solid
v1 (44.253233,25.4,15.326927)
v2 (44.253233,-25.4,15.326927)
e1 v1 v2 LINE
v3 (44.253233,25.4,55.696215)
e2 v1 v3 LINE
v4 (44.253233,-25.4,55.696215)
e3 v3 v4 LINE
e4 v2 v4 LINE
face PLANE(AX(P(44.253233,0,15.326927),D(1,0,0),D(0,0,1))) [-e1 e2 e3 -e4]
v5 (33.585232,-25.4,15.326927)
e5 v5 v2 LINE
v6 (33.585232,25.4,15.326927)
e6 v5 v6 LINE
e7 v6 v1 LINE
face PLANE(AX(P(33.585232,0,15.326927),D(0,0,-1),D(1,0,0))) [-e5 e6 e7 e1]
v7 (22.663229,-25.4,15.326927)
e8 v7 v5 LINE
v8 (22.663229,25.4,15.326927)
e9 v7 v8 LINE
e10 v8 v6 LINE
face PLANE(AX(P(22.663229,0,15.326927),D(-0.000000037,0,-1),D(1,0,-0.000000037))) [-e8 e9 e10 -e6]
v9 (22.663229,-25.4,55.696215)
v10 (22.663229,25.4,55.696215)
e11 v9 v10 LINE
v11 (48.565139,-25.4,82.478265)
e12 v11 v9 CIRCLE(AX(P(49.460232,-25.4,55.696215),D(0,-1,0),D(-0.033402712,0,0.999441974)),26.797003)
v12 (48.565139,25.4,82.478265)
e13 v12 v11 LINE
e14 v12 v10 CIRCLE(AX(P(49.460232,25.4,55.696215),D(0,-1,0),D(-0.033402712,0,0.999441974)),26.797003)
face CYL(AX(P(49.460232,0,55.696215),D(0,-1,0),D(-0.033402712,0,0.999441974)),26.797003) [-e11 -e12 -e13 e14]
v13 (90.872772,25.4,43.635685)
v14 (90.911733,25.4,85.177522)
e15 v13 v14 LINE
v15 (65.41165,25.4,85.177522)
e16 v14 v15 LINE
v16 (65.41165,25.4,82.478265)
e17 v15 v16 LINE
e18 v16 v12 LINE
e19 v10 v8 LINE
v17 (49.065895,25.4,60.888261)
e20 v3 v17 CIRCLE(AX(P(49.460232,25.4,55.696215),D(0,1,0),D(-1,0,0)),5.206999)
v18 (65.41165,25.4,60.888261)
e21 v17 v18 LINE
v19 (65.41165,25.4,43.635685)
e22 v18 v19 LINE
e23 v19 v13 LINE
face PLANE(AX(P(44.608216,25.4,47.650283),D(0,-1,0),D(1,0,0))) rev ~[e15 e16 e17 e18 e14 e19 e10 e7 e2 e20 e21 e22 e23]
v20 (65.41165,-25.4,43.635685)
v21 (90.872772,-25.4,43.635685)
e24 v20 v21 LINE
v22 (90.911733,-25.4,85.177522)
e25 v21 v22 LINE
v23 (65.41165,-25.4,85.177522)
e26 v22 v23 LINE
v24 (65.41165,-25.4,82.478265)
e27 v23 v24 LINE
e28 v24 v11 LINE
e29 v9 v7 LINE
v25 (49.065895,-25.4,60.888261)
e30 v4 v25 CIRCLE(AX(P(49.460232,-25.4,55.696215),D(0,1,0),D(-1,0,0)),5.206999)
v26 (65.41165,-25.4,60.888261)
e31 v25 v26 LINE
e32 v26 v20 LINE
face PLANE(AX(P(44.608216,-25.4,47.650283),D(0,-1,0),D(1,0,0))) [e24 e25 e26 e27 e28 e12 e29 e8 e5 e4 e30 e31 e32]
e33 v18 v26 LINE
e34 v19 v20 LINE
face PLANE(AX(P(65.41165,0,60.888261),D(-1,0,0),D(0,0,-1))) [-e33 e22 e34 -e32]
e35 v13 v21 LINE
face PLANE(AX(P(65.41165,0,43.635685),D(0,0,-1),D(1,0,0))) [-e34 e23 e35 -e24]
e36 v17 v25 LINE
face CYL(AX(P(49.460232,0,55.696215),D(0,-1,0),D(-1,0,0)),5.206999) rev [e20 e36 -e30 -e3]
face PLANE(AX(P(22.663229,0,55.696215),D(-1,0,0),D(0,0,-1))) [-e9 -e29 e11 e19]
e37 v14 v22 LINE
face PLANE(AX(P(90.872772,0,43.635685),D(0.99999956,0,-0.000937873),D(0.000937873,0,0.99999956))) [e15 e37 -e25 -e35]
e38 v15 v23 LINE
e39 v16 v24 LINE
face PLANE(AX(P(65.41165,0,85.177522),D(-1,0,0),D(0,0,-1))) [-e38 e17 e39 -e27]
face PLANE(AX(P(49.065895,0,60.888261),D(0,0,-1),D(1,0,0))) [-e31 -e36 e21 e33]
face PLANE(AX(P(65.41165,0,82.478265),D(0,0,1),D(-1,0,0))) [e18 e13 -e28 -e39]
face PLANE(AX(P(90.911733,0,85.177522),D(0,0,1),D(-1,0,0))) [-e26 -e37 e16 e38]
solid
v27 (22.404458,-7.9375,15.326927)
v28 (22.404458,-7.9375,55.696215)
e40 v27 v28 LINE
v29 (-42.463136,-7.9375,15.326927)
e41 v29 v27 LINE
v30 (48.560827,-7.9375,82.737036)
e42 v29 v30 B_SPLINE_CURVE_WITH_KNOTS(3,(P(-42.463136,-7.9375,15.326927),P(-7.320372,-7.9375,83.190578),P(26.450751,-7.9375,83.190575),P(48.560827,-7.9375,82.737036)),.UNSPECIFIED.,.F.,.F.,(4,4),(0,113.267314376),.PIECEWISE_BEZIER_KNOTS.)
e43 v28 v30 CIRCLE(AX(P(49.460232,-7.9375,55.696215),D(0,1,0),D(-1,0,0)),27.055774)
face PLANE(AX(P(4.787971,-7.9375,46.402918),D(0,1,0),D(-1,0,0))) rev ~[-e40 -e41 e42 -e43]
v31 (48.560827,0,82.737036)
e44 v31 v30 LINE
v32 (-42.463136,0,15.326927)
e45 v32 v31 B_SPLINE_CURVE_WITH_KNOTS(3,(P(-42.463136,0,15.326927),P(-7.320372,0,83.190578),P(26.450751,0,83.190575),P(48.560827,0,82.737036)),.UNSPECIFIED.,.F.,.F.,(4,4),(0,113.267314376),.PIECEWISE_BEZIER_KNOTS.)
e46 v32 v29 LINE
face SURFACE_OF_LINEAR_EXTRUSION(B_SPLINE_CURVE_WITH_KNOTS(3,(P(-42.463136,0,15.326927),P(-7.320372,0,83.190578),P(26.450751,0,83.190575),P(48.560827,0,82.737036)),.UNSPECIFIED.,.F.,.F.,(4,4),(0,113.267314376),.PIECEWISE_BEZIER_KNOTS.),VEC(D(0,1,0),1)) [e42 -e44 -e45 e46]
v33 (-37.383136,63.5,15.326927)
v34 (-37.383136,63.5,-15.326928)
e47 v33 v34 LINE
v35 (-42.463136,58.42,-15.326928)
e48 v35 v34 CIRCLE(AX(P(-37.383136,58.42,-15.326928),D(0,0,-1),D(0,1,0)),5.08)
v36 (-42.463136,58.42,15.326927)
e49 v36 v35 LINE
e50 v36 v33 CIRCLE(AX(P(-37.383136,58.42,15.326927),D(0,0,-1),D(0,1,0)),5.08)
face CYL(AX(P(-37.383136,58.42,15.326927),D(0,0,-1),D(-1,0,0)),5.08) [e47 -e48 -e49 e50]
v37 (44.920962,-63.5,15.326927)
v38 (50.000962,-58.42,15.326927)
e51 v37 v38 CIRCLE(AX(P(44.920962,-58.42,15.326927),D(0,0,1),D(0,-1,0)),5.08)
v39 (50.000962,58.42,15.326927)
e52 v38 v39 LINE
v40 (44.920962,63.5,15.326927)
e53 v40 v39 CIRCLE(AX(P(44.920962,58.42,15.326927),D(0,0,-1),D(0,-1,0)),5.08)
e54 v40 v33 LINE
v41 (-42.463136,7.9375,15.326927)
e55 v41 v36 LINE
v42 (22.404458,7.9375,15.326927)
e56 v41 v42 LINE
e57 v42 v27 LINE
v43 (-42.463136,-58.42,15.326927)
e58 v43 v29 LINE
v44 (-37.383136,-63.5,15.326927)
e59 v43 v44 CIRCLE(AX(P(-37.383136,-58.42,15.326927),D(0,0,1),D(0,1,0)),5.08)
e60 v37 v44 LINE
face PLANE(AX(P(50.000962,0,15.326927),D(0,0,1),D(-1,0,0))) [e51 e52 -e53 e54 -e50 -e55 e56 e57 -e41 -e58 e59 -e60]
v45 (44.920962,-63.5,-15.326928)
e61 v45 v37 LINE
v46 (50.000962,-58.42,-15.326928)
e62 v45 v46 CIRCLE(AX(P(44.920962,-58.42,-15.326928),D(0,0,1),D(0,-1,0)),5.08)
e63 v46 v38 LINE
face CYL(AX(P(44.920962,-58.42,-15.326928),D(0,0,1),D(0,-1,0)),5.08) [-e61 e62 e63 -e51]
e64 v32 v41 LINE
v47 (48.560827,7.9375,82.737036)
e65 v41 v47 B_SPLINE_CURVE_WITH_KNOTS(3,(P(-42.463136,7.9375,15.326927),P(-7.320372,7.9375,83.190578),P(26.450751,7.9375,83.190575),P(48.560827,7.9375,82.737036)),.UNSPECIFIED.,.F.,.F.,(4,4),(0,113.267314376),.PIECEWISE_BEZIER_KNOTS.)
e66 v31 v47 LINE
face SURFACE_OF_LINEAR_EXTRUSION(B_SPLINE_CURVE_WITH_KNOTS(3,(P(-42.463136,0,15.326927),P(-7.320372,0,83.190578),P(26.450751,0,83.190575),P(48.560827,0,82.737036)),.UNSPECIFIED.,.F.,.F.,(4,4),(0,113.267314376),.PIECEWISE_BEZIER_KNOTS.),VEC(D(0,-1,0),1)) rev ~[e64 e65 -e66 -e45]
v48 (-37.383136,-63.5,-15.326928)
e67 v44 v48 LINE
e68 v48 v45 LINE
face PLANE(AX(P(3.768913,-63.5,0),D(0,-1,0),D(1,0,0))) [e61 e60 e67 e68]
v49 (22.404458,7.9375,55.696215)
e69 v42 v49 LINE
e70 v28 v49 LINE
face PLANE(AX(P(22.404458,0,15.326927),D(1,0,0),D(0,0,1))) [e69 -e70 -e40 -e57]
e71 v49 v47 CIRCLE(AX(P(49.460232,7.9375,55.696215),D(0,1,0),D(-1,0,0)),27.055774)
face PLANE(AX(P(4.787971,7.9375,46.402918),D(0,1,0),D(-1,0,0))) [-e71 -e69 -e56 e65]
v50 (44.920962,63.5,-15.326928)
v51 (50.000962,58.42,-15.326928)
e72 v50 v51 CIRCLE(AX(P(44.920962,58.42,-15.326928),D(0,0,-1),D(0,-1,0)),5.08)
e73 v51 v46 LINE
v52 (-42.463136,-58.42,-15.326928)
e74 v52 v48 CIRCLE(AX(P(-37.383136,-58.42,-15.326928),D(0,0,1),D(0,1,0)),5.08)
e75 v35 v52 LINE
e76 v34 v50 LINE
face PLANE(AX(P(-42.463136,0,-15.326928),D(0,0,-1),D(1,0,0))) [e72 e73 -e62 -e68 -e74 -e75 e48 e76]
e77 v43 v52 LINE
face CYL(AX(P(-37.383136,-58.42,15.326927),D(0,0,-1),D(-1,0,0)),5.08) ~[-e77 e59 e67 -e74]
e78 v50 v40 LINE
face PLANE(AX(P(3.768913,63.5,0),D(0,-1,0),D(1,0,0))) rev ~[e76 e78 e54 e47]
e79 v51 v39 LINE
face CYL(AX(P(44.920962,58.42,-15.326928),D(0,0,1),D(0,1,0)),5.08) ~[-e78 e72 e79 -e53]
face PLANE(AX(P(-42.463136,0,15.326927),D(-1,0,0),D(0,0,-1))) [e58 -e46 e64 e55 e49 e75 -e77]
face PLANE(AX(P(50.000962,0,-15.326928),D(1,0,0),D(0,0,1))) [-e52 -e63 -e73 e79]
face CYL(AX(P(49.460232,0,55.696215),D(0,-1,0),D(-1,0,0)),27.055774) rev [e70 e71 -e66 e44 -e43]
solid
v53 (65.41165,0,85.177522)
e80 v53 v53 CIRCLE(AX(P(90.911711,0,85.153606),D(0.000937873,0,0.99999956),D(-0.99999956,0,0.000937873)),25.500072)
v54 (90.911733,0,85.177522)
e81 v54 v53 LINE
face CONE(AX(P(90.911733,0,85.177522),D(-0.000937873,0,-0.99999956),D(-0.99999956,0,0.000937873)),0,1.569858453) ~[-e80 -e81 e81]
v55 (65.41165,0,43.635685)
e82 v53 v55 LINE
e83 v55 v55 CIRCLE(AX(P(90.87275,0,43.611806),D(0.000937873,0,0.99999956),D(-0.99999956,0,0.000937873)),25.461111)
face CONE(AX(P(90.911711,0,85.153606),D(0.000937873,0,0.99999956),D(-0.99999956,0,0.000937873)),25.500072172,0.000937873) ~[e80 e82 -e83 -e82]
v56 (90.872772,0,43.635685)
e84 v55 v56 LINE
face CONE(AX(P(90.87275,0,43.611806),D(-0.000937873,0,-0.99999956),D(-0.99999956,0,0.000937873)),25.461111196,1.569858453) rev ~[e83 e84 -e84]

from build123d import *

# Parameters (mm, degrees)
F1_DEPTH = 63.5
F2_DEPTH = 25.4
F3_DEPTH = 7.9375
F5_R     = 5.08


# Not quite as in the source:
# - ends of sketch curves that miss each other by under 0.0002 mm in the source are joined


with BuildPart() as f1:
    # F0 (on Front) → F1 (new body, symmetric)
    with BuildSketch(Plane.XZ):
        Polygon((-42.4631357271, 15.3269270076), (-42.4631357271, -15.3269278245), (50.0009615827, -15.3269278245), (50.0009615827, 15.3269270076), (44.2532325515, 15.3269270076), (33.5852317512, 15.3269270076), (22.6632287853, 15.3269270076), (22.4044577503, 15.3269270076), align=None)
    extrude(amount=F1_DEPTH, both=True)

    # F0 (on Front) → F3 (join, symmetric)
    with BuildSketch(Plane.XZ):
        with BuildLine():
            add(Edge.make_bspline(
                [(-42.4631357271, 15.3269270076), (-7.3203722905, 83.1905780265), (26.4507513371, 83.1905752423), (48.56082653, 82.7370360494)],
                knots=[0, 0, 0, 0, 113.2673143763, 113.2673143763, 113.2673143763, 113.2673143763], degree=3))
            Line((-42.4631357271, 15.3269270076), (22.4044577503, 15.3269270076))
            Line((22.4044577503, 15.3269270076), (22.4044577503, 55.6962154806))
            ThreePointArc((22.4044577503, 55.6962154806), (30.0135223742, 74.5068614342), (48.56082653, 82.7370360494))
        make_face()
    extrude(amount=F3_DEPTH, both=True)

    # F5
    f5_edges = [f1.edges().sort_by_distance(p)[0] for p in [
        (-42.463136, -63.5, 0),
        (50.000962, -63.5, 0),
        (50.000962, 63.5, 0),
        (-42.463136, 63.5, 0),
    ]]
    fillet(f5_edges, radius=F5_R)


with BuildPart() as f2:
    # F0 (on Front) → F2 (new body, symmetric)
    with BuildSketch(Plane.XZ):
        with BuildLine():
            Line((33.5852317512, 15.3269270076), (44.2532325515, 15.3269270076))
            Line((44.2532325515, 15.3269270076), (44.2532325515, 55.6962154806))
            ThreePointArc((44.2532325515, 55.6962154806), (45.6414524036, 59.2359562846), (49.0658950772, 60.8882612482))
            Line((49.0658950772, 60.8882612482), (65.4116496444, 60.8882612482))
            Line((65.4116496444, 60.8882612482), (65.4116496444, 71.5562620485))
            Line((65.4116496444, 71.5562620485), (48.7713574063, 71.5562620485))
            ThreePointArc((48.7713574063, 71.5562620485), (37.9939440951, 66.6752806679), (33.5852317512, 55.6962154806))
            Line((33.5852317512, 55.6962154806), (33.5852317512, 15.3269270076))
        make_face()
        with BuildLine():
            Line((22.6632287853, 55.6962154806), (22.6632287853, 15.326927416))
            Line((22.6632287853, 15.326927416), (33.5852317512, 15.3269270076))
            Line((33.5852317512, 15.3269270076), (33.5852317512, 55.6962154806))
            ThreePointArc((33.5852317512, 55.6962154806), (37.9939440951, 66.6752806679), (48.7713574063, 71.5562620485))
            Line((48.7713574063, 71.5562620485), (65.4116496444, 71.5562620485))
            Line((65.4116496444, 71.5562620485), (65.4116496444, 82.4782650144))
            Line((65.4116496444, 82.4782650144), (48.565139174, 82.4782650144))
            ThreePointArc((48.565139174, 82.4782650144), (30.1980256678, 74.325407217), (22.6632287853, 55.6962154806))
        make_face()
        Polygon((65.4116496444, 85.1775221527), (65.4116496444, 82.7370360494), (65.4116496444, 82.4782650144), (65.4116496444, 71.5562620485), (65.4116496444, 60.8882612482), (65.4116496444, 43.6356849968), (90.872772038, 43.6356849968), (90.9117330309, 85.1775221527), align=None)
    extrude(amount=F2_DEPTH, both=True)


with BuildPart() as f4:
    # F0 (on Front) → F4 (revolve)
    with BuildSketch(Plane.XZ):
        Polygon((65.4116496444, 85.1775221527), (65.4116496444, 82.7370360494), (65.4116496444, 82.4782650144), (65.4116496444, 71.5562620485), (65.4116496444, 60.8882612482), (65.4116496444, 43.6356849968), (90.872772038, 43.6356849968), (90.9117330309, 85.1775221527), align=None)
    revolve(axis=Axis((90.8922525345, 0, 64.4066035748), (0.0009378732, 0, 0.9999995602)))


solid = Compound([f1.part, f2.part, f4.part])
